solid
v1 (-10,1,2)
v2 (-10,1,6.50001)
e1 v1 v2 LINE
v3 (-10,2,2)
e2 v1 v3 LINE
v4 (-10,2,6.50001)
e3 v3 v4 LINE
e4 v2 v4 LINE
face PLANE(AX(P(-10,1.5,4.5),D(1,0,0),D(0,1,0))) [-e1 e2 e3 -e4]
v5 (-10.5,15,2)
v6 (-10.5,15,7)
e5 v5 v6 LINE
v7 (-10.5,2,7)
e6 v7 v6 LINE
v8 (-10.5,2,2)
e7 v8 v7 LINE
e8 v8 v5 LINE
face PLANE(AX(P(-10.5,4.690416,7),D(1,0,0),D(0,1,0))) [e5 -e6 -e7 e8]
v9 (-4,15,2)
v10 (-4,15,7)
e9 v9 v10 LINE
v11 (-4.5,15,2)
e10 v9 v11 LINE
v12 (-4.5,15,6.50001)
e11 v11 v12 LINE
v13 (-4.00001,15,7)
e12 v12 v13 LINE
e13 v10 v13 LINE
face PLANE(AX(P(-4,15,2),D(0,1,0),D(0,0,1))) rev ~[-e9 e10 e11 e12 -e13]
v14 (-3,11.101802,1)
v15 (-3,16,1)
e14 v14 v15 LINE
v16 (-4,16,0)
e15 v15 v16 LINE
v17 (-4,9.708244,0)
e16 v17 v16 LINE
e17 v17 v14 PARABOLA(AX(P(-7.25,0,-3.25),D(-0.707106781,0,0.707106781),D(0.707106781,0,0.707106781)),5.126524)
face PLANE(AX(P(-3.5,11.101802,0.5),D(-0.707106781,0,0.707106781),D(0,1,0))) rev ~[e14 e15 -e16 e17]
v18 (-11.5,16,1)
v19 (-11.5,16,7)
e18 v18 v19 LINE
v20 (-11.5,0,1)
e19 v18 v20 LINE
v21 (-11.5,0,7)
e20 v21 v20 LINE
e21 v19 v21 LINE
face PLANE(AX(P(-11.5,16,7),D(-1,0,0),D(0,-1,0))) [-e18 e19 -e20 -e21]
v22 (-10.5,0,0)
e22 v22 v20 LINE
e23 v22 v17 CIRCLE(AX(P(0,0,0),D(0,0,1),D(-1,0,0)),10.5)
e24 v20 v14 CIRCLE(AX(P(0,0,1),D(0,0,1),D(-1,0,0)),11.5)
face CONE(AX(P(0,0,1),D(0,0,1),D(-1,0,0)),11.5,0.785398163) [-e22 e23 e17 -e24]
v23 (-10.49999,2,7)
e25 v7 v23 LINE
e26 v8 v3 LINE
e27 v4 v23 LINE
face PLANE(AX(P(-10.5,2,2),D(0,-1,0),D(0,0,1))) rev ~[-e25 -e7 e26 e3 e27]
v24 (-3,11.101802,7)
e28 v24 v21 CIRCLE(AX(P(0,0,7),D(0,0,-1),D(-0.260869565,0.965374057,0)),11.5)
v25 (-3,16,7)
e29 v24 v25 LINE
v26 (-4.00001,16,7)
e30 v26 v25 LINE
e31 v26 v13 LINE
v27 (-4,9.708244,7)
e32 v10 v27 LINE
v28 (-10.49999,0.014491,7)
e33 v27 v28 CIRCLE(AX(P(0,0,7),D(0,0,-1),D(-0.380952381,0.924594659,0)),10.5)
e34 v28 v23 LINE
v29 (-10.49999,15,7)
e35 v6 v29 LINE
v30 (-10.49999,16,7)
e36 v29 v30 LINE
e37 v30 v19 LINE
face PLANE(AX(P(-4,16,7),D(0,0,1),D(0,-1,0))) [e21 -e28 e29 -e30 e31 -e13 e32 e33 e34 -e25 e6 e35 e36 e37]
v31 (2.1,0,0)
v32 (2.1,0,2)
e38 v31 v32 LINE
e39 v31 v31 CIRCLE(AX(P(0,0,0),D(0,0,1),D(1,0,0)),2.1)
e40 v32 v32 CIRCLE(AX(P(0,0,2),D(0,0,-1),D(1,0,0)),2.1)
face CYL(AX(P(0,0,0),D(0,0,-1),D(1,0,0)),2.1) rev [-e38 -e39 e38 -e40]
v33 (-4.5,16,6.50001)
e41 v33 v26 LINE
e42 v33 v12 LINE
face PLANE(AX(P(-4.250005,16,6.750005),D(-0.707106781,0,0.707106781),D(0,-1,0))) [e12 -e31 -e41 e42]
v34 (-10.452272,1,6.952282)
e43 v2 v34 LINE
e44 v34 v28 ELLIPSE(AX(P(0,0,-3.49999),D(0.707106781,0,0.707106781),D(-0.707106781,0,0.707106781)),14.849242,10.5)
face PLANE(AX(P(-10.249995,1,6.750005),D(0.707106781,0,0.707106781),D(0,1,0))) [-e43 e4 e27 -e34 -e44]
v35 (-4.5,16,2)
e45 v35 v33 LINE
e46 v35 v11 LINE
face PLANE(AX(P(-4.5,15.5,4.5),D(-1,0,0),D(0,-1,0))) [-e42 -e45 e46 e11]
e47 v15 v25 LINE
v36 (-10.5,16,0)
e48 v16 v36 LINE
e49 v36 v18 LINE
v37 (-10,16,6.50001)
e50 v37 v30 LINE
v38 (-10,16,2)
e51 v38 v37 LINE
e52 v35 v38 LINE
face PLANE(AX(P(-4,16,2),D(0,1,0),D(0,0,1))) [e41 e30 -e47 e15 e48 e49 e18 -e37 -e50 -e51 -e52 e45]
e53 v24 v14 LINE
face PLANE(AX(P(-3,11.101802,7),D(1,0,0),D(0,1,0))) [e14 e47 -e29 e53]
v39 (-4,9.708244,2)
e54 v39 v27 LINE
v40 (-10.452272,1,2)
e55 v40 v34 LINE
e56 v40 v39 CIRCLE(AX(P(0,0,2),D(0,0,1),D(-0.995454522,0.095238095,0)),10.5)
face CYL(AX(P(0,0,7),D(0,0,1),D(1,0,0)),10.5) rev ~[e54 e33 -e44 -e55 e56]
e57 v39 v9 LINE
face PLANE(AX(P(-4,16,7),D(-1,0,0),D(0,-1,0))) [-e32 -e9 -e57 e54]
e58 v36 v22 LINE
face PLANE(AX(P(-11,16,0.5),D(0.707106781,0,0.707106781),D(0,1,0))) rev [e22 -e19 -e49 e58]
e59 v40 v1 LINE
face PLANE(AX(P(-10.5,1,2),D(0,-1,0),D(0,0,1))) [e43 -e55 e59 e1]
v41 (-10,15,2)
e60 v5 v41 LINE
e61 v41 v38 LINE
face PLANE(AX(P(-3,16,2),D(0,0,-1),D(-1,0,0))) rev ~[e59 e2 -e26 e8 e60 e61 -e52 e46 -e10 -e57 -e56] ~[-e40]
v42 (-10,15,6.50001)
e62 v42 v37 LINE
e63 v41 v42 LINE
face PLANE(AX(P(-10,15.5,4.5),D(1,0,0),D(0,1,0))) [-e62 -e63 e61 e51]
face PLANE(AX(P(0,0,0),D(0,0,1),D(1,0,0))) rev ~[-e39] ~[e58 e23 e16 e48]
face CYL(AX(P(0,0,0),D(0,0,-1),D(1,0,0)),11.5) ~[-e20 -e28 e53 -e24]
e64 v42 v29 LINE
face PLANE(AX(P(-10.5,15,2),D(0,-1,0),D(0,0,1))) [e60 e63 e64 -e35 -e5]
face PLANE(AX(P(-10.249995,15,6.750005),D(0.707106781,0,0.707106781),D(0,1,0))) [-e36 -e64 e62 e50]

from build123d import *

# Parameters (mm, degrees)
F0_R      = 11.5
F0_R_2    = 2.1
F1_DEPTH  = 7
F2_R      = 10.5
F3_DEPTH  = 5
F5_DEPTH  = 7
F6_W      = 8.5
F6_H      = 2
F7_DEPTH  = 12.8
F8_W      = 6.5
F8_H      = 5
F9_DEPTH  = 15
F10_W     = 1
F10_H     = 5
F11_DEPTH = 0.5
F12_W     = 1
F12_H     = 5
F13_DEPTH = 0.5
F14_SIZE  = 0.49999
F15_SIZE  = 1


# Not quite as in the source:
# - a fillet or chamfer is up to 0.001 mm smaller than in the source, because OpenCascade refuses the exact size


with BuildPart() as f1:
    # F0 (on Top) → F1 (new body)
    with BuildSketch(Plane.XY):
        Circle(F0_R)
        Circle(F0_R_2, mode=Mode.SUBTRACT)
    extrude(amount=F1_DEPTH)

    # F2 (on face) → F3 (cut)
    with BuildSketch(Plane.XY.offset(7)):
        Circle(F2_R)
    extrude(amount=-F3_DEPTH, mode=Mode.SUBTRACT)

    # F4 (on face) → F5 (join)
    with BuildSketch(Plane.XY.offset(7)):
        with BuildLine():
            Line((-11.5, 16), (-11.5, 0))
            ThreePointArc((-11.5, 0), (-11.2472218792, 2.3979157617), (-10.5, 4.6904157598))
            Line((-10.5, 4.6904157598), (-10.5, 16))
            Line((-10.5, 16), (-11.5, 16))
        make_face()
        with BuildLine():
            ThreePointArc((-4, 10.7819293264), (-3.5036523196, 10.9532835453), (-3, 11.1018016556))
            Line((-3, 11.1018016556), (-3, 16))
            Line((-3, 16), (-4, 16))
            Line((-4, 16), (-4, 10.7819293264))
        make_face()
    extrude(amount=-F5_DEPTH)

    # F6 (on face) → F7 (join)
    with BuildSketch(Plane(origin=(0, 16, 0), x_dir=(-1, 0, 0), z_dir=(0, 1, 0))):
        with Locations((7.25, 1)):
            Rectangle(F6_W, F6_H)
    extrude(amount=-F7_DEPTH)

    # F8 (on face) → F9 (cut)
    with BuildSketch(Plane(origin=(0, 16, 0), x_dir=(-1, 0, 0), z_dir=(0, 1, 0))):
        with Locations((7.25, 4.5)):
            Rectangle(F8_W, F8_H)
    extrude(amount=-F9_DEPTH, mode=Mode.SUBTRACT)

    # F10 (on face) → F11 (join)
    with BuildSketch(Plane.YZ.offset(-10.5)):
        with Locations((1.5, 4.5)):
            Rectangle(F10_W, F10_H)
        with Locations((15.5, 4.5)):
            Rectangle(F10_W, F10_H)
    extrude(amount=F11_DEPTH)

    # F12 (on face) → F13 (join)
    with BuildSketch(Plane(origin=(-4, 0, 0), x_dir=(0, -1, 0), z_dir=(-1, 0, 0))):
        with Locations((-15.5, 4.5)):
            Rectangle(F12_W, F12_H)
    extrude(amount=F13_DEPTH)

    # F14 (size 0.5 in the source; OpenCascade refuses exactly that, so slightly less here)
    f14_edges = [f1.edges().sort_by_distance(p)[0] for p in [
        (-10, 1.5, 7),
        (-10, 15.5, 7),
        (-4.5, 15.5, 7),
    ]]
    chamfer(f14_edges, length=F14_SIZE)

    # F15
    f15_edges = [f1.edges().sort_by_distance(p)[0] for p in [
        (9.130991, -6.991066, 0),
        (-3, 13.550901, 0),
        (-11.5, 8, 0),
    ]]
    chamfer(f15_edges, length=F15_SIZE)


solid = f1.part
